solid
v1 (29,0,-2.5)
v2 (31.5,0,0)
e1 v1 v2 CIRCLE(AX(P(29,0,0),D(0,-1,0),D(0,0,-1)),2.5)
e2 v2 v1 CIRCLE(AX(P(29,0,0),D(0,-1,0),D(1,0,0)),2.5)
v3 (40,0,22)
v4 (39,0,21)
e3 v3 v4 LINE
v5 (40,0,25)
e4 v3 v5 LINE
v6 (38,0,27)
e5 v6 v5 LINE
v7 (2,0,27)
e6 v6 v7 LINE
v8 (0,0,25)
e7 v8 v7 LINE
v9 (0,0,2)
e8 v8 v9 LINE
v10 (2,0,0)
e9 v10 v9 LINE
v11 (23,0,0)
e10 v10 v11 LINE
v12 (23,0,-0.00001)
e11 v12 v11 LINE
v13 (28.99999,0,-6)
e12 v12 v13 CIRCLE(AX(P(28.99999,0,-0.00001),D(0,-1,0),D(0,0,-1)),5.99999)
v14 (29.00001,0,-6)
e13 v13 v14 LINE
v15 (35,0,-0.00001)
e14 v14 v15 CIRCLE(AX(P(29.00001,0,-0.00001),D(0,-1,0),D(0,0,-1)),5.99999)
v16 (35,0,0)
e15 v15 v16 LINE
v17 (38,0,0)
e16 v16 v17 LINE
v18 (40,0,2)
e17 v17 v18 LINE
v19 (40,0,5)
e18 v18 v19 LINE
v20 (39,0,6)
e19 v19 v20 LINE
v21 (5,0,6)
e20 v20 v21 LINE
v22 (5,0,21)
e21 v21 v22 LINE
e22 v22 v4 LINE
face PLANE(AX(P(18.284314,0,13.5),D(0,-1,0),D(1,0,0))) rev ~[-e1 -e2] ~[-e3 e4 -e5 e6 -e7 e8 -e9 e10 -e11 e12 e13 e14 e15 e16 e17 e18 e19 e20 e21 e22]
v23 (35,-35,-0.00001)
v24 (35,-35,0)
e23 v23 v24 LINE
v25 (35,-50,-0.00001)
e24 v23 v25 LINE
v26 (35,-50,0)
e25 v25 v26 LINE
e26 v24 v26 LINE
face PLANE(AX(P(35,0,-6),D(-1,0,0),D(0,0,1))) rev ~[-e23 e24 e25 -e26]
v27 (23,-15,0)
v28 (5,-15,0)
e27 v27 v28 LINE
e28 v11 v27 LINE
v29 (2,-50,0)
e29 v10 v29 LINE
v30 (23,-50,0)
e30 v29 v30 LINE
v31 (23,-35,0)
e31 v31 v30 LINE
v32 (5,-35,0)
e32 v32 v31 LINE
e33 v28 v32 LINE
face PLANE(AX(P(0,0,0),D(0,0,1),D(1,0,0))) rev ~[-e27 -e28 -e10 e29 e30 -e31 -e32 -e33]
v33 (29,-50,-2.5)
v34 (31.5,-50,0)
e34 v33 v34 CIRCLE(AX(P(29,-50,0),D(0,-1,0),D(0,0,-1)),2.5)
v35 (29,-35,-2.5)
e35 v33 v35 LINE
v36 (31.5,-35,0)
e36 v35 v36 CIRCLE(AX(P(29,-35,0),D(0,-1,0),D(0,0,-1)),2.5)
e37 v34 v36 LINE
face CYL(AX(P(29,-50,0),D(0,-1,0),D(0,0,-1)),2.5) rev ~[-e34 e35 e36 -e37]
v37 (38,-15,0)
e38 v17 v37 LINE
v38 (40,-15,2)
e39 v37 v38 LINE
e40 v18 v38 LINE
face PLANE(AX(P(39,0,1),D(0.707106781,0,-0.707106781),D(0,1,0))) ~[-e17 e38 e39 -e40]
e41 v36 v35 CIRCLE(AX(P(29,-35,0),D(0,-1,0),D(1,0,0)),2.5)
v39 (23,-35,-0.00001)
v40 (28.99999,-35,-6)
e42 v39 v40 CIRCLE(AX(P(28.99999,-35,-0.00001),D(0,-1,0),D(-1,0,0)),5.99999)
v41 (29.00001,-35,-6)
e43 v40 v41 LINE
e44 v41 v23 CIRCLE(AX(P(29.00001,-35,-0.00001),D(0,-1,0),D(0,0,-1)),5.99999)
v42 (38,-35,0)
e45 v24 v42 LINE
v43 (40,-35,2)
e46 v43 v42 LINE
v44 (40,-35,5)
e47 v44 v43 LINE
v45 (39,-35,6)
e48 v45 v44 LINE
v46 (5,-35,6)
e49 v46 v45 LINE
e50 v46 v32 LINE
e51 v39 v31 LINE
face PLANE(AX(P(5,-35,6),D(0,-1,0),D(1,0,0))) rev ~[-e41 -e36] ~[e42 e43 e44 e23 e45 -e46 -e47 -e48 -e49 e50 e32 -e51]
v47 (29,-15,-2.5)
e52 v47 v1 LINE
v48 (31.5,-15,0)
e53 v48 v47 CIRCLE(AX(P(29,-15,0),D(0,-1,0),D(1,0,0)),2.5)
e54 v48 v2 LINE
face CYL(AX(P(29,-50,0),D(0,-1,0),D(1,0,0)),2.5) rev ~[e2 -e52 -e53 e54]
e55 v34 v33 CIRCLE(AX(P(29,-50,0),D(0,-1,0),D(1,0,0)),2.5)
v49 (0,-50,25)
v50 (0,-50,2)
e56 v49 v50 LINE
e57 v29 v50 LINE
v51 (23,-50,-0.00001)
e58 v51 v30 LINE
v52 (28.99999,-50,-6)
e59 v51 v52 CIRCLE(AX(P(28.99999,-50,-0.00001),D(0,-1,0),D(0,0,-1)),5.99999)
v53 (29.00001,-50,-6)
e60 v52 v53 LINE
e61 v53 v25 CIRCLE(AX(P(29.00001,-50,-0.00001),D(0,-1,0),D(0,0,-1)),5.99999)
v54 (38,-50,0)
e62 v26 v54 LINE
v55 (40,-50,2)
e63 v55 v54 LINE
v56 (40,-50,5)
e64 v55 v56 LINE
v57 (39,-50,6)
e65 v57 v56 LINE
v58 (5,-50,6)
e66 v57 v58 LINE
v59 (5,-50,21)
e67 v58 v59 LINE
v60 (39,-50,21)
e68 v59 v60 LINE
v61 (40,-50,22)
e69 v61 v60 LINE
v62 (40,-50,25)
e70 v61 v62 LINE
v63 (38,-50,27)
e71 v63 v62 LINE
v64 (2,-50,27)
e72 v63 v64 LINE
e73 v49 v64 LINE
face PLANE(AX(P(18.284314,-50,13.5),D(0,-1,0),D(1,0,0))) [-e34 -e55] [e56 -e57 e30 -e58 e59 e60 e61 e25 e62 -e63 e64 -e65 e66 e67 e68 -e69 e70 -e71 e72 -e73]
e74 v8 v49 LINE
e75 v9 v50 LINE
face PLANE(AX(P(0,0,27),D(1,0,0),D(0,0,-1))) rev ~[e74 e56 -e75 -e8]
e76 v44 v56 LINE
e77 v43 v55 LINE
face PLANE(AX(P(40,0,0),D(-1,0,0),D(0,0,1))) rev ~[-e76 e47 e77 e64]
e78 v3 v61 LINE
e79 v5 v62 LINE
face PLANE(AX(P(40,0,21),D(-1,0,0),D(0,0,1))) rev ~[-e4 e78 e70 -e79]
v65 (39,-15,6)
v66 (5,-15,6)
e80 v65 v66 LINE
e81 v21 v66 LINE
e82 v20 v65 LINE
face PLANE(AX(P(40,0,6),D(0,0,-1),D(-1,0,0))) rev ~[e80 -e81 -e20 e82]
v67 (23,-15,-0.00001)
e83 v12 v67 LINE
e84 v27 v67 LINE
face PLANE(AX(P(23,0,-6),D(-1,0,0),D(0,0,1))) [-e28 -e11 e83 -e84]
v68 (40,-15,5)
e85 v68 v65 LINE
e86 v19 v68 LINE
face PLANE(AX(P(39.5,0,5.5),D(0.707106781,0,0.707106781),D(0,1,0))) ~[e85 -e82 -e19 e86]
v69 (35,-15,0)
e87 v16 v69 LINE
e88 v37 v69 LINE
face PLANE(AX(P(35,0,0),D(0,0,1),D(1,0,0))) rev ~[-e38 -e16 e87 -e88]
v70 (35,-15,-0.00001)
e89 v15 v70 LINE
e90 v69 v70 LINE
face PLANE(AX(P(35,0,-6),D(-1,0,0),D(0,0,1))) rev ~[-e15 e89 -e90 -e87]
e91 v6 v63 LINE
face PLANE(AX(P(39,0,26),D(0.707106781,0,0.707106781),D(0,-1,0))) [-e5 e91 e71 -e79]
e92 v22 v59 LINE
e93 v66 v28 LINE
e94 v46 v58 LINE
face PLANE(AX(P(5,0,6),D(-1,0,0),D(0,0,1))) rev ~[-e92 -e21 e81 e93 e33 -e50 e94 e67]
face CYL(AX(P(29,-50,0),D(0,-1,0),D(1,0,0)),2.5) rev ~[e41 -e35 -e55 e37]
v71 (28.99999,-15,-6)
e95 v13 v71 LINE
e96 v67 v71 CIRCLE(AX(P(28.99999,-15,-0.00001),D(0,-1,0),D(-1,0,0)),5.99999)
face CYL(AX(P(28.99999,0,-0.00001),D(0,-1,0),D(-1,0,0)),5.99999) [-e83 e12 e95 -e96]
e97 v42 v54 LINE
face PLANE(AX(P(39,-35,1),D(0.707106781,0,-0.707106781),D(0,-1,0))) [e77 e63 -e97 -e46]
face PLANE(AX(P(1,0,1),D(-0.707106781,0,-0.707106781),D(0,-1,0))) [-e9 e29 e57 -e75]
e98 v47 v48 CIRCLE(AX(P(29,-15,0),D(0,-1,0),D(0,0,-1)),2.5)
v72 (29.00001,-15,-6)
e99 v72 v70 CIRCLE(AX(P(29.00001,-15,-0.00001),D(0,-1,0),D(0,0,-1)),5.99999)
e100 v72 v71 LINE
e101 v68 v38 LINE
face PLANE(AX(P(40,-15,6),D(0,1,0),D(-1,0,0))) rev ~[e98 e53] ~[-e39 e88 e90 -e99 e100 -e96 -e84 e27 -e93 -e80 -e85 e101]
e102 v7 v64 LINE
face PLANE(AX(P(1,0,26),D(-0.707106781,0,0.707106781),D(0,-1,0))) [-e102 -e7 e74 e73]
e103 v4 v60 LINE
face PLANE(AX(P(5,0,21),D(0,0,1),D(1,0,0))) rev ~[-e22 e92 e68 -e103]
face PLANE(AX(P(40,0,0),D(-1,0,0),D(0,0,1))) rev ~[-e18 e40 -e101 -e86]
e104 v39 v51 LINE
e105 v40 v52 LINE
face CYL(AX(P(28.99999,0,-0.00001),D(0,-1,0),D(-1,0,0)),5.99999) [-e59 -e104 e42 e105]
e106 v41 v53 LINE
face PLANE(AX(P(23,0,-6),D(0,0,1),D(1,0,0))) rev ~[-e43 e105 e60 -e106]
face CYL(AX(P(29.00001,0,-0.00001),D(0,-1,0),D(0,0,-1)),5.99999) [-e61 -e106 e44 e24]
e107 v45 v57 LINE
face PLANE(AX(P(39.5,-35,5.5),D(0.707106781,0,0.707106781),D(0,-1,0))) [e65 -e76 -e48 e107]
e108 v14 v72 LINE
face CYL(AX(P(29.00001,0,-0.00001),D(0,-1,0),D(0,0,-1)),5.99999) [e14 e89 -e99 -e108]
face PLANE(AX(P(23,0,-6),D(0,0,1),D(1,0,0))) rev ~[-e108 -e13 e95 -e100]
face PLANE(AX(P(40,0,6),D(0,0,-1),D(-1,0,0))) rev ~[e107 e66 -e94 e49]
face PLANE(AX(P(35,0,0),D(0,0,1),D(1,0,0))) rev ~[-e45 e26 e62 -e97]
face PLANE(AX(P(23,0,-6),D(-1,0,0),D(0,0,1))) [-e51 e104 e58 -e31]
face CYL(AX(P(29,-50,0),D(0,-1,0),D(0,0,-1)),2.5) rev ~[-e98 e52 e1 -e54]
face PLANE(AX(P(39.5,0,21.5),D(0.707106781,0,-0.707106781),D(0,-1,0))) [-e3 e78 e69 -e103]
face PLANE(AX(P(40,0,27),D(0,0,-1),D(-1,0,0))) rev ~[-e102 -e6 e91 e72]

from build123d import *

# Parameters (mm, degrees)
F0_W     = 12
F0_H     = 6
F1_DEPTH = 50
F2_R     = 5.99999
F4_DEPTH = 25
F6_DEPTH = 60
F7_SIZE  = 2
F8_SIZE  = 1


# Not quite as in the source:
# - a fillet or chamfer is up to 0.001 mm smaller than in the source, because OpenCascade refuses the exact size


with BuildPart() as f1:
    # F0 (on Front) → F1 (new body)
    with BuildSketch(Plane.XZ):
        Polygon((0, 27), (0, 0), (20, 0), (23, 0), (35, 0), (40, 0), (40, 6), (5, 6), (5, 21), (40, 21), (40, 27), align=None)
        with Locations((29, -3)):
            Rectangle(F0_W, F0_H)
    extrude(amount=F1_DEPTH)

    # F2 (radius 6 in the source; OpenCascade refuses exactly that, so slightly less here)
    f2_edges = [f1.edges().sort_by_distance(p)[0] for p in [
        (23, -25, -6),
        (35, -25, -6),
    ]]
    fillet(f2_edges, radius=F2_R)

    # F3 (on face) → F4 (cut)
    with BuildSketch(Plane.XY.offset(6)):
        Polygon((40, -35), (40, -25), (40, -15), (5, -15), (5, -35), align=None)
    extrude(amount=-F4_DEPTH, mode=Mode.SUBTRACT)

    # F5 (on face) → F6 (cut)
    with BuildSketch(Plane.XZ.offset(50)):
        with BuildLine():
            ThreePointArc((29, -2.5), (30.767766953, -1.767766953), (31.5, 0))
            ThreePointArc((31.5, 0), (27.232233047, 1.767766953), (29, -2.5))
        make_face()
    extrude(amount=-F6_DEPTH, mode=Mode.SUBTRACT)

    # F7
    f7_edges = [f1.edges().sort_by_distance(p)[0] for p in [
        (0, -25, 27),
        (40, -25, 27),
        (0, -25, 0),
        (40, -42.5, 0),
        (40, -7.5, 0),
    ]]
    chamfer(f7_edges, length=F7_SIZE)

    # F8
    f8_edges = [f1.edges().sort_by_distance(p)[0] for p in [
        (40, -42.5, 6),
        (40, -7.5, 6),
        (40, -25, 21),
    ]]
    chamfer(f8_edges, length=F8_SIZE)


solid = f1.part
